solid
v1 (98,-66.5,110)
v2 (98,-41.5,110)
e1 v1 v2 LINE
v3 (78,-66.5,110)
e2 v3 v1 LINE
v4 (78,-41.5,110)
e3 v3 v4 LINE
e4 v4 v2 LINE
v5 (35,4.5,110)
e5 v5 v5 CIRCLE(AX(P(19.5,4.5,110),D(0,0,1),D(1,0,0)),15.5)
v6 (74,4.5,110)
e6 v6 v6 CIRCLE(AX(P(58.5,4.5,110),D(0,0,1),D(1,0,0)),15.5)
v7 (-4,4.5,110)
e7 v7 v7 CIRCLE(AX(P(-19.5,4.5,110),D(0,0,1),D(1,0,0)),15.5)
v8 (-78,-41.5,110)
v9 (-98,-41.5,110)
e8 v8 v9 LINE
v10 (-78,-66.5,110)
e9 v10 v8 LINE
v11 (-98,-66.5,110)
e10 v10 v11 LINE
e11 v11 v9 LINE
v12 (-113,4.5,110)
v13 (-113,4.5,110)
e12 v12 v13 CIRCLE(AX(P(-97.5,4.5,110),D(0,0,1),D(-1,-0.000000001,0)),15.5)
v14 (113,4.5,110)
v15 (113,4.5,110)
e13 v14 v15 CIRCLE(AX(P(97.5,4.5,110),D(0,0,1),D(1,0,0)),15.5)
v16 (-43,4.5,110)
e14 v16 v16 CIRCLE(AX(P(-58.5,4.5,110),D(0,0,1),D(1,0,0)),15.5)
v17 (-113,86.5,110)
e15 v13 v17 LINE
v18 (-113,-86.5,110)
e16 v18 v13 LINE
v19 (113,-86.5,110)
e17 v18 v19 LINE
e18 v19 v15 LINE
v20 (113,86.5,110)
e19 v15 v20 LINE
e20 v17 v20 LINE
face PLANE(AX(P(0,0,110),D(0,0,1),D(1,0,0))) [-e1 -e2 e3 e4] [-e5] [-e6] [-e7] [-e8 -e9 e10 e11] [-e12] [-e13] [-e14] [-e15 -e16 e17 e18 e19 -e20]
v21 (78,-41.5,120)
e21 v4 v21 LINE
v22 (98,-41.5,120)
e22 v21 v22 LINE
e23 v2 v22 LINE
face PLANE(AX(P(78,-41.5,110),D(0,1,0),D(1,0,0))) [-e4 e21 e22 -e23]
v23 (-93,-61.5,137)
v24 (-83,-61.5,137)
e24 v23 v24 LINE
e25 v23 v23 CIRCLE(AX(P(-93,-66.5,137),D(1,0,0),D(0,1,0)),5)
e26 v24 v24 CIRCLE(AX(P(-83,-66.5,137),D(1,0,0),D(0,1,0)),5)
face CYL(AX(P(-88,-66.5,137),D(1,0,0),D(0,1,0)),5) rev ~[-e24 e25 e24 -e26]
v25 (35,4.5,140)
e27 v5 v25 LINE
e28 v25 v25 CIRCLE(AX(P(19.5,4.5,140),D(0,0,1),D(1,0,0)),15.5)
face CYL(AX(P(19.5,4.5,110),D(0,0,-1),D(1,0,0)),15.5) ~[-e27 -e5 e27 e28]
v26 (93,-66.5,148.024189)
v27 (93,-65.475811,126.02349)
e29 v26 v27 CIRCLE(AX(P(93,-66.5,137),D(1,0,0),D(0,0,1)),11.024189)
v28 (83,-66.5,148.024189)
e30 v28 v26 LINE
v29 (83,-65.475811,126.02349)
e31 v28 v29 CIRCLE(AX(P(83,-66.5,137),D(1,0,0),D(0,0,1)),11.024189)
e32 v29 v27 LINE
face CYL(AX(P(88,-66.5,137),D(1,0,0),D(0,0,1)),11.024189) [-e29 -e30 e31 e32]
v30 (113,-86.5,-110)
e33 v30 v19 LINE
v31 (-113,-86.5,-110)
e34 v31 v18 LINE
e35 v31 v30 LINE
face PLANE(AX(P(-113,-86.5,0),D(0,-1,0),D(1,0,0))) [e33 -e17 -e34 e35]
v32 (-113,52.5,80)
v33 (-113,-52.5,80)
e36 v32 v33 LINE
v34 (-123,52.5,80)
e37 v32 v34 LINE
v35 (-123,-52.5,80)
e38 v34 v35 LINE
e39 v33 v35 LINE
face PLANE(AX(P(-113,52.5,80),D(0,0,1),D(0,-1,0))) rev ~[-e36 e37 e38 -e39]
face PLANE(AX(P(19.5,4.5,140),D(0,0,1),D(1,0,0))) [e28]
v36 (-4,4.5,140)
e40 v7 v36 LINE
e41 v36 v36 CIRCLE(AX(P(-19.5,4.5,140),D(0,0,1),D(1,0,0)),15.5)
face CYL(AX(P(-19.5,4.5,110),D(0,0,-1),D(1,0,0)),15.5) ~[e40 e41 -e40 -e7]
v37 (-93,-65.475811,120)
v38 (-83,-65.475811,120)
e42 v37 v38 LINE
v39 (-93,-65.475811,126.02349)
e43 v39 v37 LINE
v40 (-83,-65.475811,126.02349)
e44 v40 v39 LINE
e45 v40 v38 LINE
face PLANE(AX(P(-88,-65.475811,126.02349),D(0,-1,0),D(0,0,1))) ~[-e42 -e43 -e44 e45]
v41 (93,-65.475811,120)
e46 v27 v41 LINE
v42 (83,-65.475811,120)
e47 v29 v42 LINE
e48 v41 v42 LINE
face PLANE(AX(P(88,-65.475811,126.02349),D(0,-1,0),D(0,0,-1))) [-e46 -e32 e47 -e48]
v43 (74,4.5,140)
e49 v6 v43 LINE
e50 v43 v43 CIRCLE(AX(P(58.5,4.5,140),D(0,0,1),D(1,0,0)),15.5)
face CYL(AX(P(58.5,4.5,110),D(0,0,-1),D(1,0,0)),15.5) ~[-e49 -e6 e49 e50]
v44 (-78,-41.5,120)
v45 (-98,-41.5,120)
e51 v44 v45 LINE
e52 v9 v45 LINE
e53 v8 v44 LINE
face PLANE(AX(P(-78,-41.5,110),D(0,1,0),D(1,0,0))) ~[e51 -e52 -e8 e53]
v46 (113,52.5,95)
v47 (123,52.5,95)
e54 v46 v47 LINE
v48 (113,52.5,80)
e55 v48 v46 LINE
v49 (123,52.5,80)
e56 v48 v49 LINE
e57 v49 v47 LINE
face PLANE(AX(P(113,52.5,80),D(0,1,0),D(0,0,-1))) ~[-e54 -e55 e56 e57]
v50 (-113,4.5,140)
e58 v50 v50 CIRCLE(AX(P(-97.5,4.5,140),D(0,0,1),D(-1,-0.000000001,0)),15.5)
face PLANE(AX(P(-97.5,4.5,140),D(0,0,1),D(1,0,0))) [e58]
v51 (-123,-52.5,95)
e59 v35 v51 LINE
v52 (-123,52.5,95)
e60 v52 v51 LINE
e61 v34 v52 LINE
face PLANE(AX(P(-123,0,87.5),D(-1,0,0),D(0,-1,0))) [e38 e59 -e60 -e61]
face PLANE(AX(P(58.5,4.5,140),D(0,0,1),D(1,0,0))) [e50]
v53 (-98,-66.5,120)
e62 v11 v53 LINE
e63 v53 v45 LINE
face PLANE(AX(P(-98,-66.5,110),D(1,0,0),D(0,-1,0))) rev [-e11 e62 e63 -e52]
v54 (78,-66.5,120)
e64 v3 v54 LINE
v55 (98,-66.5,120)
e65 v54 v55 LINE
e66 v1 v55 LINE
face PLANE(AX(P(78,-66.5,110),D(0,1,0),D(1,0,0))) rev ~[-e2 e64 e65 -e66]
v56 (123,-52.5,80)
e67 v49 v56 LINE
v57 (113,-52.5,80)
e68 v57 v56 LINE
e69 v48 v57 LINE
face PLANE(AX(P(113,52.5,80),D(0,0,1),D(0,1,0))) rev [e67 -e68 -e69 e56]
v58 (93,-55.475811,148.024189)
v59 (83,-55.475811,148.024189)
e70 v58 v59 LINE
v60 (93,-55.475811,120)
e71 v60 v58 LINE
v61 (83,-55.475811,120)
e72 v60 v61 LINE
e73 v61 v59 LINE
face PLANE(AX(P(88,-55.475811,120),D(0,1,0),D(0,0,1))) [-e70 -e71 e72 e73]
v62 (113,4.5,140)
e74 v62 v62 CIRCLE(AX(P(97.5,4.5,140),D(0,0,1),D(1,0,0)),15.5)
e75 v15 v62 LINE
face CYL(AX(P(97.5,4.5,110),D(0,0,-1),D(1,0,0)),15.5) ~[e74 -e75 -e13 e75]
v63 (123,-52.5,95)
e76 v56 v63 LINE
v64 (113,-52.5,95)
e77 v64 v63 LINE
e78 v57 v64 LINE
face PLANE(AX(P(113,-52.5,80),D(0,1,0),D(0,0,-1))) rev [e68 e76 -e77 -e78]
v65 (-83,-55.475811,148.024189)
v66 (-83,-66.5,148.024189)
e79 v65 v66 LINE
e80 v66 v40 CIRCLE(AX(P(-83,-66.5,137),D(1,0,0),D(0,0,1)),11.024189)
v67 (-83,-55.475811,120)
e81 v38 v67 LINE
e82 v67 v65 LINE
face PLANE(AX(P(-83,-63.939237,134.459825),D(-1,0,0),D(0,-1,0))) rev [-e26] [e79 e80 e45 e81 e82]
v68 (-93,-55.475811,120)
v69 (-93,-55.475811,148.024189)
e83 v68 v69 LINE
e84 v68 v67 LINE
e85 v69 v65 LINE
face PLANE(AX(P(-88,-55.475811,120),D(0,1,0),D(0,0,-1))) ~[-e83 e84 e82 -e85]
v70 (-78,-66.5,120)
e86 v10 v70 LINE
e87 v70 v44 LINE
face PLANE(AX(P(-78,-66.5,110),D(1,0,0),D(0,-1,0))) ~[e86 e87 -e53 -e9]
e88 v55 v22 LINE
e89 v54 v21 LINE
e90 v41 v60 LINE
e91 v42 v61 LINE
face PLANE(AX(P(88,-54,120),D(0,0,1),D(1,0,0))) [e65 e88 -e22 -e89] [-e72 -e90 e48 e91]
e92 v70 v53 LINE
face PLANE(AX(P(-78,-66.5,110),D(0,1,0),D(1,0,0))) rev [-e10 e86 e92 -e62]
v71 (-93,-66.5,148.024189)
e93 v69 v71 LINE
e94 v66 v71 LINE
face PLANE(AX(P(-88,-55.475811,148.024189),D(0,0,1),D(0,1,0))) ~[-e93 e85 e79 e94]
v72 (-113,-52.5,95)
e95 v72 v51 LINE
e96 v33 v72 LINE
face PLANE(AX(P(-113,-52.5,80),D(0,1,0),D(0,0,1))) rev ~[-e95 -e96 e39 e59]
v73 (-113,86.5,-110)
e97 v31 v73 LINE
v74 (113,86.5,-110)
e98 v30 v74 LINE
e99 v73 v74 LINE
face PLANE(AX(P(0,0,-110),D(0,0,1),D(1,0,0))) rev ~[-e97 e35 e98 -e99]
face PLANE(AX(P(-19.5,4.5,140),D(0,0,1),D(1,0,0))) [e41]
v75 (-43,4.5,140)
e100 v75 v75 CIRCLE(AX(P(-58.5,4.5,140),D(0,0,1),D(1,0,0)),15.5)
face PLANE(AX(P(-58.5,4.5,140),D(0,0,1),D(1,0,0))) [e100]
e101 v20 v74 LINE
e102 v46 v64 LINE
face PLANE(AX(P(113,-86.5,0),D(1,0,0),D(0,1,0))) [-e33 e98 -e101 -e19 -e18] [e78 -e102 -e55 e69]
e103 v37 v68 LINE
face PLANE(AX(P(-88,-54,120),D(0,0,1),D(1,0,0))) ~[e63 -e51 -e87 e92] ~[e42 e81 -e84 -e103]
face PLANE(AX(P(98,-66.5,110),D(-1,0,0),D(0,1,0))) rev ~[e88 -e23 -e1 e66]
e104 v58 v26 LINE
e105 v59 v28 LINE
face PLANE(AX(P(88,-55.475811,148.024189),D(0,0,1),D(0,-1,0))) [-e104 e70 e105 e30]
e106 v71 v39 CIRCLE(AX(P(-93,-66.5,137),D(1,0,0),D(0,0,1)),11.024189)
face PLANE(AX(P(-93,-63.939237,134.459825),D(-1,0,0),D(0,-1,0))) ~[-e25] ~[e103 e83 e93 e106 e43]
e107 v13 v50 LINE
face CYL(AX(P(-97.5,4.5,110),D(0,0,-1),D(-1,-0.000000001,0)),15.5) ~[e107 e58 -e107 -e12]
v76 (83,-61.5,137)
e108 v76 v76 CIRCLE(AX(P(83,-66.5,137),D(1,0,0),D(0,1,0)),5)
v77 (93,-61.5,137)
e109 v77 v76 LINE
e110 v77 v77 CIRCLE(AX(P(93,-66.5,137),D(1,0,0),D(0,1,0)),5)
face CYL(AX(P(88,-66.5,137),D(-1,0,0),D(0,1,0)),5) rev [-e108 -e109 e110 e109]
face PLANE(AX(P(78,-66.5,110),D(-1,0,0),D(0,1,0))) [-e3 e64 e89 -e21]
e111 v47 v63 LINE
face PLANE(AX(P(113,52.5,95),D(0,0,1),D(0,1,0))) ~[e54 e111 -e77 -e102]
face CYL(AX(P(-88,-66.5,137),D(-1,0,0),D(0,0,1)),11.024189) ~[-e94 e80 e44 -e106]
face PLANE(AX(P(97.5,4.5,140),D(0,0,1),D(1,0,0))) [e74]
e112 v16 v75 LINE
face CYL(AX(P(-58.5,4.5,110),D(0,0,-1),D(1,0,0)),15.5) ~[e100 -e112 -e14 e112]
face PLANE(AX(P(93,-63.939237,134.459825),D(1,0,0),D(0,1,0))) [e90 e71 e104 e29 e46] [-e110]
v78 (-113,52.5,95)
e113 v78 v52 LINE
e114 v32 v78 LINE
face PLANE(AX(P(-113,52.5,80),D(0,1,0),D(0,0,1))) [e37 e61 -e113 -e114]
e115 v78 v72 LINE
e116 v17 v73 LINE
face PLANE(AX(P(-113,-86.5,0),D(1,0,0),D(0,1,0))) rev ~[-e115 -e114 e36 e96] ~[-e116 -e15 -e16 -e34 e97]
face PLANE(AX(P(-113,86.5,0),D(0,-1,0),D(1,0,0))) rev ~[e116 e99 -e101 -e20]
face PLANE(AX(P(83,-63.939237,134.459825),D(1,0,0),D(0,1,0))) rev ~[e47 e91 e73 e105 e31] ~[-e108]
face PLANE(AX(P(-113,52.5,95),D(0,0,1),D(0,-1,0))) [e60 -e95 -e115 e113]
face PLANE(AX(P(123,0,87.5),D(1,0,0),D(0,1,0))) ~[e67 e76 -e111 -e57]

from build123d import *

# Parameters (mm, degrees)
F0_W      = 226
F0_H      = 173
F1_DEPTH  = 110
F2_W      = 105
F2_H      = 15
F3_DEPTH  = 10
F4_R      = 15.5
F5_DEPTH  = 30
F6_W      = 20
F6_H      = 25
F7_DEPTH  = 10
F10_R     = 5
F11_DEPTH = 5


# Not quite as in the source:
# - a pattern or mirror of a feature is missing from the dataset's text; its kind, count and spacing are read off the source's solid


with BuildPart() as f1:
    # F0 (on Top) → F1 (new body, symmetric)
    with BuildSketch(Plane.XY):
        Rectangle(F0_W, F0_H)
    extrude(amount=F1_DEPTH, both=True)

    # F2 (on face) → F3 (join)
    with BuildSketch(Plane(origin=(-113, 0, 0), x_dir=(0, -1, 0), z_dir=(-1, 0, 0))):
        with Locations((0, 87.5)):
            Rectangle(F2_W, F2_H)
    f3 = extrude(amount=F3_DEPTH)

    # F3_copies: F3 across plane
    add(f3.mirror(Plane(origin=(0, 0, 0), x_dir=(0, 0, 1), z_dir=(1, 0, 0))))

    # F4 (on face) → F5 (join)
    with BuildSketch(Plane.XY.offset(110)):
        with BuildLine():
            ThreePointArc((-82, 4.5), (-97.5000000043, 20), (-113, 4.4999999915))
            ThreePointArc((-113, 4.4999999915), (-97.4999999957, -11), (-82, 4.5))
        make_face()
        with Locations((-58.5, 4.5)):
            Circle(F4_R)
        with Locations((-19.5, 4.5)):
            Circle(F4_R)
        with Locations((19.5, 4.5)):
            Circle(F4_R)
        with Locations((58.5, 4.5)):
            Circle(F4_R)
        with Locations((97.5, 4.5)):
            Circle(F4_R)
    extrude(amount=F5_DEPTH)

    # F6 (on face) → F7 (join)
    with BuildSketch(Plane.XY.offset(110)):
        with Locations((88, -54)):
            Rectangle(F6_W, F6_H)
    f7 = extrude(amount=F7_DEPTH)

    # F7_copies: F7 across plane
    add(f7.mirror(Plane(origin=(0, 0, 0), x_dir=(0, 0, -1), z_dir=(-1, 0, 0))))

    # F10 (on plane+point) → F11 (join, symmetric)
    with BuildSketch(Plane.YZ.offset(88)):
        with BuildLine():
            Line((-55.4758111389, 148.0241888611), (-66.5, 148.0241888611))
            ThreePointArc((-66.5, 148.0241888611), (-77.5122627569, 136.4873509794), (-65.4758111389, 126.0234897521))
            Line((-65.4758111389, 126.0234897521), (-65.4758111389, 120))
            Line((-65.4758111389, 120), (-55.4758111389, 120))
            Line((-55.4758111389, 120), (-55.4758111389, 137))
            Line((-55.4758111389, 137), (-55.4758111389, 148.0241888611))
        make_face()
        with Locations((-66.5, 137)):
            Circle(F10_R, mode=Mode.SUBTRACT)
    f11 = extrude(amount=F11_DEPTH, both=True)

    # F11_copies: F11 across plane
    add(f11.mirror(Plane(origin=(0, 0, 0), x_dir=(0, 0, -1), z_dir=(-1, 0, 0))))


solid = f1.part
